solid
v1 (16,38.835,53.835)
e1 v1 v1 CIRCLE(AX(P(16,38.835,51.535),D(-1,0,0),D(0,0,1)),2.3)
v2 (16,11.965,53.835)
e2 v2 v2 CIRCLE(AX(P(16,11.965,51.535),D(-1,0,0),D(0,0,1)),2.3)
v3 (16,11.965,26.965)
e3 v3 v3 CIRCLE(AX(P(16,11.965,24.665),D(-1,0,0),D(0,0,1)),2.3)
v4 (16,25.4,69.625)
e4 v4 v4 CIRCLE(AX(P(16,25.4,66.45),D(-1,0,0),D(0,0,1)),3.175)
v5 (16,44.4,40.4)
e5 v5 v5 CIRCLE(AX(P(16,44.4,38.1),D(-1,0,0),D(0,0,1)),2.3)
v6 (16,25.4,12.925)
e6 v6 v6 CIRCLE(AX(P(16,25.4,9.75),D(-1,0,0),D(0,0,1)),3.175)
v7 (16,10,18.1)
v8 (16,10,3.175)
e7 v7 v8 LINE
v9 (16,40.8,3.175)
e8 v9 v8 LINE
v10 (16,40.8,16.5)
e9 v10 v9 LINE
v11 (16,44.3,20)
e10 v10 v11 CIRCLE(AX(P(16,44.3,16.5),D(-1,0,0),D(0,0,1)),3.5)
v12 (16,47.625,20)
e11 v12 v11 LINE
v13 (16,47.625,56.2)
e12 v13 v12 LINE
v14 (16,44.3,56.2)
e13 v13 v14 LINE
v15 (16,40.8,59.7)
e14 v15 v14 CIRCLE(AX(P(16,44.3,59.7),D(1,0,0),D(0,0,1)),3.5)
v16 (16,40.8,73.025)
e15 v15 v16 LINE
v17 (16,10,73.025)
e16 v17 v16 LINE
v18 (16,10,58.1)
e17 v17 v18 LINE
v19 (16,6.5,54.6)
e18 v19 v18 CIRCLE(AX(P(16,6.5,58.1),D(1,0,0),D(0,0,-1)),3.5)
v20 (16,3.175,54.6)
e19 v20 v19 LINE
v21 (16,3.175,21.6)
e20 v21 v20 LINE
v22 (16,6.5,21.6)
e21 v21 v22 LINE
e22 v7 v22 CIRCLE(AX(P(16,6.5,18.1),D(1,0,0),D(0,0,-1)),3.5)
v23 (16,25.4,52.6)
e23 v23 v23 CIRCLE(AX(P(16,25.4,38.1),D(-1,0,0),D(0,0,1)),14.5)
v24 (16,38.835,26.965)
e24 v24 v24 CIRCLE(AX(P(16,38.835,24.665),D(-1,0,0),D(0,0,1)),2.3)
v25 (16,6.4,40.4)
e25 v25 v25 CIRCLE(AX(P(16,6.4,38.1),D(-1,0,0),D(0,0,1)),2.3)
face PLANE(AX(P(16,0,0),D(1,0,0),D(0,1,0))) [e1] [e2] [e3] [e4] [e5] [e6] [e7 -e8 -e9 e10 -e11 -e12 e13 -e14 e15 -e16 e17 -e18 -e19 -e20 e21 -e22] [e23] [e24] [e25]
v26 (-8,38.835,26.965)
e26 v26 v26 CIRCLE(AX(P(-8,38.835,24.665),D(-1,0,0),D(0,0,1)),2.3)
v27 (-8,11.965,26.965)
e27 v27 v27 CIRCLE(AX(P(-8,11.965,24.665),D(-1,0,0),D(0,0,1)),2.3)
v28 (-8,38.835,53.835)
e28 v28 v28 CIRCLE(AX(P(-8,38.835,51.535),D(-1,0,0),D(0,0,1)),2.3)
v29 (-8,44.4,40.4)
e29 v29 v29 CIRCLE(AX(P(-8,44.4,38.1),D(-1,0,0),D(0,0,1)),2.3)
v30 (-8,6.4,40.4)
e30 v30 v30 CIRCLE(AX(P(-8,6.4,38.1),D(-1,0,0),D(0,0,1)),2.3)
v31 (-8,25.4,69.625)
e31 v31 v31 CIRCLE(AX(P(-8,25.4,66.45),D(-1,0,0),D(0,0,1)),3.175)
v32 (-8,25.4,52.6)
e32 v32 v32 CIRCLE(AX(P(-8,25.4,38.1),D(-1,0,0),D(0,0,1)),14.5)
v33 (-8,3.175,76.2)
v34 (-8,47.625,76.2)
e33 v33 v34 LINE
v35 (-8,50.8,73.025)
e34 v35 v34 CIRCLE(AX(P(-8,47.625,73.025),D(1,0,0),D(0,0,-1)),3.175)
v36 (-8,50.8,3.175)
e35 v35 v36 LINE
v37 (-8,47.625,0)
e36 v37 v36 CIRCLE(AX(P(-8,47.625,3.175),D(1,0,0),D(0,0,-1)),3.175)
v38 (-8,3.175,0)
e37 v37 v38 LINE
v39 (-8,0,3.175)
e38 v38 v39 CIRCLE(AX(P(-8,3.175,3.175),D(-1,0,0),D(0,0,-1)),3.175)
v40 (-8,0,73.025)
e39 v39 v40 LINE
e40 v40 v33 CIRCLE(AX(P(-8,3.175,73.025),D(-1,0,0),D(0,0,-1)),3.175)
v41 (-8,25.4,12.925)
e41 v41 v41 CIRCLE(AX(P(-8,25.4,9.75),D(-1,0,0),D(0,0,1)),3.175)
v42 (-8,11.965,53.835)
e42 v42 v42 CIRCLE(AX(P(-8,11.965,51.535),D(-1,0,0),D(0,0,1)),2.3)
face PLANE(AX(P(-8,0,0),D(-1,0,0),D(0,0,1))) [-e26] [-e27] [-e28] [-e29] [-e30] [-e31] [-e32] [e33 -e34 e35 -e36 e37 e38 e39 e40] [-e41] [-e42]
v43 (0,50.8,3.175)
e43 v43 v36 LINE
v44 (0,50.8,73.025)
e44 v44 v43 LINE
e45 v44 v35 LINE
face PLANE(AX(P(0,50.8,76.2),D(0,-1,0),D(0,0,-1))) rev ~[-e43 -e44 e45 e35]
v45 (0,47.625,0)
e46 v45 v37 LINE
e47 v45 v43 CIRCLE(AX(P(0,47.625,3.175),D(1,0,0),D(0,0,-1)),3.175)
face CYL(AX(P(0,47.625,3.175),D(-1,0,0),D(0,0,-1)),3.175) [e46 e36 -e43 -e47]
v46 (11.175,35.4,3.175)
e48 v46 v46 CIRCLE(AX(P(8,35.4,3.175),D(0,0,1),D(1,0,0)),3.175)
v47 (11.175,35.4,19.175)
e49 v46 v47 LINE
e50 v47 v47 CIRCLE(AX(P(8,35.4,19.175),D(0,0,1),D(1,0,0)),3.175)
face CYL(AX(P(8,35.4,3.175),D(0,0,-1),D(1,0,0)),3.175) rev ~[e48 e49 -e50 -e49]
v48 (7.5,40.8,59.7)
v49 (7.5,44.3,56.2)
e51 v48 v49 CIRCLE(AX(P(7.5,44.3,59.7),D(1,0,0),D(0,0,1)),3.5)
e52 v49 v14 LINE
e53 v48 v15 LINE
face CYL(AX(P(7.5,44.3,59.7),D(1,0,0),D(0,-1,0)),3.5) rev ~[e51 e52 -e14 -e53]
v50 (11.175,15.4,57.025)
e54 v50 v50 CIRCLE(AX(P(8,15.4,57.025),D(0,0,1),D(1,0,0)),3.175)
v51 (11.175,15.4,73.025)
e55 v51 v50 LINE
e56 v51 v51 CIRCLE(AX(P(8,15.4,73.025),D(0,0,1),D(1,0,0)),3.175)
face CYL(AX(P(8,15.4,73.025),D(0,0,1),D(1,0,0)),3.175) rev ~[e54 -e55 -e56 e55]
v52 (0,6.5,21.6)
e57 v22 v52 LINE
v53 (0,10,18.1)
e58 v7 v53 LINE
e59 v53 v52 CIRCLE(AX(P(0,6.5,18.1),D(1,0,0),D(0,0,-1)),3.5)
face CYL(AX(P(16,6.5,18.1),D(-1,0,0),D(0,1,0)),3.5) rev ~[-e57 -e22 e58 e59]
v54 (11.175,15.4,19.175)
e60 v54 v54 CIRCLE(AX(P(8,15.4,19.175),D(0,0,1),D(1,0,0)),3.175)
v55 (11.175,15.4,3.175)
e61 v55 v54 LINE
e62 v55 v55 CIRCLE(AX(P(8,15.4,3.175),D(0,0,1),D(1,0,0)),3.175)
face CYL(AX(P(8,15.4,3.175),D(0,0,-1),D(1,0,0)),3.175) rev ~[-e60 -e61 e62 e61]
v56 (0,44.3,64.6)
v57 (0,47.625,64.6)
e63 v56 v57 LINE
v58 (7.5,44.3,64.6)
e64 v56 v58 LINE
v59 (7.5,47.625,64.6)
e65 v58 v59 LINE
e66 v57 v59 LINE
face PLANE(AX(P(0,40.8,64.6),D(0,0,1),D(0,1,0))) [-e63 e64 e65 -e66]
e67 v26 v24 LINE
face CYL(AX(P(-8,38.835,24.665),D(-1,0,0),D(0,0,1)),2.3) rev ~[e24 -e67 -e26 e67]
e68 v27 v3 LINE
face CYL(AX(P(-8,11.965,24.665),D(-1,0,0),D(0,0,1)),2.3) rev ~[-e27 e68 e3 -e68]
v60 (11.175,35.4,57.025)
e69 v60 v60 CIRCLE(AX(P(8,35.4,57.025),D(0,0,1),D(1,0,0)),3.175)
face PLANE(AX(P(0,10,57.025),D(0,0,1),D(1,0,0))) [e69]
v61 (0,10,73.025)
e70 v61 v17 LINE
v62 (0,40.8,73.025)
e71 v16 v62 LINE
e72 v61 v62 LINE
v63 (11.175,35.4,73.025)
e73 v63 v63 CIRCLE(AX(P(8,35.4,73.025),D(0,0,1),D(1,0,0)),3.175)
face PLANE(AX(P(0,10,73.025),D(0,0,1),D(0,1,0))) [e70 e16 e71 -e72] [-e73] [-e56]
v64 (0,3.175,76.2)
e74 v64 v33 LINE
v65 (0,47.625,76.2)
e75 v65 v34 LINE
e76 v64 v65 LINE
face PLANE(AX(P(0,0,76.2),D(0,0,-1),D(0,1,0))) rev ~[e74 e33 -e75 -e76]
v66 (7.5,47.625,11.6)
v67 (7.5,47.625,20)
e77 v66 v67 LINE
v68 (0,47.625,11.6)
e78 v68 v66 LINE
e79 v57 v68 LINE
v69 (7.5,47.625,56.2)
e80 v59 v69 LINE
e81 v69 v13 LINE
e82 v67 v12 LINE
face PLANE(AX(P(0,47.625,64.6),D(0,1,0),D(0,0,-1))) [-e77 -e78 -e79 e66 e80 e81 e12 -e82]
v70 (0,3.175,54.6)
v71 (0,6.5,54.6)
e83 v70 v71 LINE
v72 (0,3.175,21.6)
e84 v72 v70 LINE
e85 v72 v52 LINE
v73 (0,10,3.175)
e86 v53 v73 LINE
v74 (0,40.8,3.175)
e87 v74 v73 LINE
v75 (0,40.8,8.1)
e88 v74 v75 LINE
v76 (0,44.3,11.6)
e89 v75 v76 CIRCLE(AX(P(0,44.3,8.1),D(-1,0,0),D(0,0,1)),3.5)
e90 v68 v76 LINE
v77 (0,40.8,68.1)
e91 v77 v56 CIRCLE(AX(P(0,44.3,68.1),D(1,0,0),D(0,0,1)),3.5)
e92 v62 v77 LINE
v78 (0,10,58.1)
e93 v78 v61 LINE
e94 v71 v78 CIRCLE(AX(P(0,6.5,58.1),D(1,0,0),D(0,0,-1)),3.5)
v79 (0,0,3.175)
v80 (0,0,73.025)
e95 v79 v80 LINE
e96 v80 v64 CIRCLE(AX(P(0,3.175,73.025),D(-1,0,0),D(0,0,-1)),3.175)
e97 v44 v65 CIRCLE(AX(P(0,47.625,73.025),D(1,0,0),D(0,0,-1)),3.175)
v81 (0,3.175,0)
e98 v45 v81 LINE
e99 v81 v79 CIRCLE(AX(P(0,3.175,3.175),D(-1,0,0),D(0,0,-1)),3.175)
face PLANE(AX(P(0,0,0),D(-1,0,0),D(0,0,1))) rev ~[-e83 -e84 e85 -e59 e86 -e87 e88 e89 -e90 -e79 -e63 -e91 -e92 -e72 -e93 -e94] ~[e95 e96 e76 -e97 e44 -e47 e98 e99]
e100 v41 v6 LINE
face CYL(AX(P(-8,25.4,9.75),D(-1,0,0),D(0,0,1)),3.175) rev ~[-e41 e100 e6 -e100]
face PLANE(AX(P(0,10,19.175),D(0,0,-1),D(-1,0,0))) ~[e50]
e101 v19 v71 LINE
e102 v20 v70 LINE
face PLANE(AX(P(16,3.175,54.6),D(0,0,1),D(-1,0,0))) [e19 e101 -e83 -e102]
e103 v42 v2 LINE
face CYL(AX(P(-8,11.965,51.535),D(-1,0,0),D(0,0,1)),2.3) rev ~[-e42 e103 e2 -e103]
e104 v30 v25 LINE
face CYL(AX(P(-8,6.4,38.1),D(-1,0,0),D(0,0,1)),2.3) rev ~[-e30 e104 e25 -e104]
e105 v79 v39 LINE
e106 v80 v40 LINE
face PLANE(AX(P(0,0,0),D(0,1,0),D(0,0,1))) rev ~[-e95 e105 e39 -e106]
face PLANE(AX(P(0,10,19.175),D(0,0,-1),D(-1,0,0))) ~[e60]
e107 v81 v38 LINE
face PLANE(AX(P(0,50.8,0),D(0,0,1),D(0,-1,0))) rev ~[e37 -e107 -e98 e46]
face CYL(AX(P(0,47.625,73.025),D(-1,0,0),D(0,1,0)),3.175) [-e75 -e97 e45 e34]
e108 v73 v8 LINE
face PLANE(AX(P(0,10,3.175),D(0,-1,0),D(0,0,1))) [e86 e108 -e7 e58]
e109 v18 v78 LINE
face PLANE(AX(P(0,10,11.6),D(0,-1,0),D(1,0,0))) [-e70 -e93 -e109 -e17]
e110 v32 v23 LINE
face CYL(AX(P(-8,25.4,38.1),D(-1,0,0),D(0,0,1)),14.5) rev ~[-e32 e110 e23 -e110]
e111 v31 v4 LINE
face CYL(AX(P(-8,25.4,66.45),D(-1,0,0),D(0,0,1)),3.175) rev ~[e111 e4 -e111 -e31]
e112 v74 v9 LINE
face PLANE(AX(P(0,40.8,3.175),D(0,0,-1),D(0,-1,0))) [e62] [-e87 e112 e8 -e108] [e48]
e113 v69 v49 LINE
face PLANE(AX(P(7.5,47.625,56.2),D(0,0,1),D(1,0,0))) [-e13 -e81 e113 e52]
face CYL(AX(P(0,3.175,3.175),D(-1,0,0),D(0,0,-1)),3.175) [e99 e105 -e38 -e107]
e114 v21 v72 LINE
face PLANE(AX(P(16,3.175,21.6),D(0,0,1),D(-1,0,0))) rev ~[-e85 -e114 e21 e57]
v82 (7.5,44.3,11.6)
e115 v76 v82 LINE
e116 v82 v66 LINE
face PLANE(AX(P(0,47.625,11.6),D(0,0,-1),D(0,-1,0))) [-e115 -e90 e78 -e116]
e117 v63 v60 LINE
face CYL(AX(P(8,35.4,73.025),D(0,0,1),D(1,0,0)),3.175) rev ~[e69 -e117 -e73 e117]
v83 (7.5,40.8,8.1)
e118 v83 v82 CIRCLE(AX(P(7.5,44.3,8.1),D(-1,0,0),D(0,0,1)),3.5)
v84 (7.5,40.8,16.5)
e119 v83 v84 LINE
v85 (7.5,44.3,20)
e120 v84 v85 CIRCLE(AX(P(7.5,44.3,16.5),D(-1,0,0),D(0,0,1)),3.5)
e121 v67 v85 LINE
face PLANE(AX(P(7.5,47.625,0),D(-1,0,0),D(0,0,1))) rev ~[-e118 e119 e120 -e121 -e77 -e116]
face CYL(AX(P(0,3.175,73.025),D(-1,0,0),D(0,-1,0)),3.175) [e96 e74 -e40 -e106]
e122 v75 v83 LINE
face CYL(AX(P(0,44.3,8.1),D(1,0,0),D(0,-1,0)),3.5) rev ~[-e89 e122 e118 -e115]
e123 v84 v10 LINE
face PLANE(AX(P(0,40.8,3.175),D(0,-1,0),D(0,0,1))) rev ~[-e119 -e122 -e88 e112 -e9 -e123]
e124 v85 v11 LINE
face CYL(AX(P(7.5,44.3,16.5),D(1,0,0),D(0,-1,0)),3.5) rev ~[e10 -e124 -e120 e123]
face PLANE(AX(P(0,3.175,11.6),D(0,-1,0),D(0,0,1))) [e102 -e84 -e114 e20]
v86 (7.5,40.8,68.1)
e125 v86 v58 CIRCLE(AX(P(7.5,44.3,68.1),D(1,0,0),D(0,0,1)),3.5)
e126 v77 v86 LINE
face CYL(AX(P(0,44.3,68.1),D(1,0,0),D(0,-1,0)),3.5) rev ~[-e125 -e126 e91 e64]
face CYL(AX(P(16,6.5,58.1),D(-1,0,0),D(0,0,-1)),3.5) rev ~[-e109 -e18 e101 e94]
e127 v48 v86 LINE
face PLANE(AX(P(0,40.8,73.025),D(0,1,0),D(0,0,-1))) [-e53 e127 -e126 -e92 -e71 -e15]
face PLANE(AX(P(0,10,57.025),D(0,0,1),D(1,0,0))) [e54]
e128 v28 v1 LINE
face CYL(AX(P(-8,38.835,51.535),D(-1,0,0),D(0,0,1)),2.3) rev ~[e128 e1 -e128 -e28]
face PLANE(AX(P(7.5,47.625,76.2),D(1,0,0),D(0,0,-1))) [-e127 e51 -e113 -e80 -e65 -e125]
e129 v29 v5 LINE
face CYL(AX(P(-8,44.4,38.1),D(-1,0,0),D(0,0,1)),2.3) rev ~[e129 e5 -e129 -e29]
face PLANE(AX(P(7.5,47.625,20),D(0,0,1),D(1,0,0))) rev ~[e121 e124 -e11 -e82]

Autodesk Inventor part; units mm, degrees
ref_plane "YZ Plane" through (0, 0, 0) normal (1, 0, 0) x (0, 1, 0)
ref_plane "XZ Plane" through (0, 0, 0) normal (0, 1, 0) x (-1, 0, 0)
sketch "Sketch1" plane through (0, 0, 0) normal (1, 0, 0) x (0, 1, 0)
  line L0 (0, 0) -> (50.8, 0) construction
  line L1 (50.8, 0) -> (50.8, 76.2) construction
  line L2 (50.8, 76.2) -> (0, 76.2) construction
  line L3 (0, 76.2) -> (0, 0) construction
  line L4 (40.8, 3.175) -> (10, 3.175)
  line L5 (10, 3.175) -> (10, 11.6)
  line L6 (10, 11.6) -> (3.175, 11.6)
  line L7 (3.175, 11.6) -> (3.175, 64.6)
  line L8 (3.175, 64.6) -> (10, 64.6)
  line L9 (10, 64.6) -> (10, 73.025)
  line L10 (10, 73.025) -> (40.8, 73.025)
  line L11 (40.8, 73.025) -> (40.8, 64.6)
  line L12 (40.8, 64.6) -> (47.625, 64.6)
  line L13 (47.625, 64.6) -> (47.625, 11.6)
  line L14 (47.625, 11.6) -> (40.8, 11.6)
  line L15 (40.8, 3.175) -> (40.8, 11.6)
  line L16 (25.4, 73.025) -> (25.4, 76.2) construction
  line L17 (47.625, 38.1) -> (50.8, 38.1) construction
  line L18 (3.175, 38.1) -> (0, 38.1) construction
  line L19 (25.4, 3.175) -> (25.4, 0) construction
  point P0 (1.5875, 38.1)
  dimension "d0" = 50.8
  dimension "d1" = 76.2
  dimension "d2" = 3.175
  dimension "d3" = 26.5
  dimension "d4" = 10
extrude "Extrusion1" add sketch "Sketch1" along normal blind 16
sketch "Sketch2" plane through (0, 10, 73.025) normal (0, 0, 1) x (1, 0, 0)
  line L0 (0, -10) -> (16, -10) construction
  line L1 (16, -10) -> (16, 40.8) construction
  line L2 (16, 40.8) -> (0, 40.8) construction
  line L3 (0, 40.8) -> (0, -10) construction
  circle A0 centre (8, 25.4) radius 3.175
  circle A1 centre (8, 5.4) radius 3.175
  line L4 (8, 25.4) -> (8, 40.8) construction
  line L5 (8, 5.4) -> (8, -10) construction
  dimension "d7" = 16
  dimension "d8" = 50.8
  dimension "d9" = 6.35
  dimension "d10" = 20
extrude "Extrusion2" cut sketch "Sketch2" against normal blind 16
ref_plane "Work Plane1" through (0, 10, 38.1) normal (0, 0, 1) x (1, 0, 0)
mirror "Mirror1" about plane through (0, 10, 38.1) normal (0, 0, 1) of "Extrusion2"
sketch "Sketch5" plane through (0, 47.625, 64.6) normal (0, 1, 0) x (1, 0, 0)
  line L0 (0, 64.6) -> (16, 64.6) construction
  line L1 (16, 64.6) -> (16, -11.6) construction
  line L2 (16, -11.6) -> (0, -11.6) construction
  line L3 (0, -11.6) -> (0, 64.6) construction
  line L4 (12.5, 3.4) -> (12.5, -11.6) construction
  line L5 (12.5, 49.6) -> (12.5, 64.6) construction
  line L6 (7.5, 8.4) -> (16, 8.4)
  line L7 (16, 8.4) -> (16, -11.6)
  line L8 (16, -11.6) -> (7.5, -11.6)
  line L9 (7.5, -11.6) -> (7.5, 8.4)
  line L10 (12.5, 3.4) -> (7.5, 3.4) construction
  line L11 (12.5, 3.4) -> (16, 3.4) construction
  line L12 (12.5, 3.4) -> (12.5, 8.4) construction
  line L13 (7.5, 44.6) -> (16, 44.6)
  line L14 (16, 44.6) -> (16, 64.6)
  line L15 (16, 64.6) -> (7.5, 64.6)
  line L16 (7.5, 64.6) -> (7.5, 44.6)
  line L17 (12.5, 49.6) -> (12.5, 44.6) construction
  line L18 (12.5, 49.6) -> (7.5, 49.6) construction
  dimension "d18" = 76.2
  dimension "d19" = 16
  dimension "d21" = 15
  dimension "d22" = 12.5
  dimension "d23" = 5
extrude "Extrusion4" cut sketch "Sketch5" against normal up to surface (6.825 mm away)
sketch "Sketch6" plane through (0, 3.175, 11.6) normal (0, -1, 0) x (1, 0, 0)
  line L0 (0, -11.6) -> (16, -11.6) construction
  line L1 (16, -11.6) -> (16, 64.6) construction
  line L2 (16, 64.6) -> (0, 64.6) construction
  line L3 (0, 64.6) -> (0, -11.6) construction
  line L4 (10, 53) -> (10, 0) construction
  line L5 (10, 26.5) -> (0, 26.5) construction
  line L6 (16, 43) -> (0, 43)
  line L7 (0, 43) -> (0, 64.6)
  line L8 (0, 64.6) -> (16, 64.6)
  line L9 (16, 64.6) -> (16, 43)
  line L10 (16, 10) -> (0, 10)
  line L11 (0, 10) -> (0, -11.6)
  line L12 (0, -11.6) -> (16, -11.6)
  line L13 (16, -11.6) -> (16, 10)
  dimension "d26" = 16
  dimension "d27" = 76.2
  dimension "d28" = 10
  dimension "d29" = 53
  dimension "d30" = 10
extrude "Extrusion5" cut sketch "Sketch6" against normal up to surface (6.825 mm away)
fillet "Fillet1" radius 3.5 6 edges at (8, 10, 54.6) (3.75, 40.8, 64.6) (11.75, 40.8, 56.2) (3.75, 40.8, 11.6) (11.75, 40.8, 20) (8, 10, 21.6)
sketch "Sketch4" plane through (0, 0, 0) normal (-1, 0, 0) x (0, 0, 1)
  line L0 (0, 0) -> (76.2, 0)
  line L1 (76.2, 0) -> (76.2, 50.8)
  line L2 (76.2, 50.8) -> (0, 50.8)
  line L3 (0, 50.8) -> (0, 0)
  dimension "d13" = 76.2
  dimension "d14" = 50.8
extrude "Extrusion3" add sketch "Sketch4" along normal blind 8
sketch "Sketch7" plane through (-8, 0, 0) normal (-1, 0, 0) x (0, 0, 1)
  circle A0 centre (38.1, 25.4) radius 14.5
  circle A1 centre (38.1, 25.4) radius 19 construction
  circle A2 centre (24.665, 38.835) radius 2.3
  circle A3 centre (38.1, 44.4) radius 2.3
  circle A4 centre (24.665, 11.965) radius 2.3
  circle A5 centre (38.1, 6.4) radius 2.3
  circle A6 centre (51.535, 38.835) radius 2.3
  circle A7 centre (51.535, 11.965) radius 2.3
  line L0 (51.535, 38.835) -> (38.1, 25.4) construction
  line L1 (38.1, 25.4) -> (38.1, 44.4) construction
  line L2 (0, 0) -> (76.2, 0) construction
  line L3 (76.2, 0) -> (76.2, 50.8) construction
  line L4 (76.2, 50.8) -> (0, 50.8) construction
  line L5 (0, 50.8) -> (0, 0) construction
  circle A8 centre (9.75, 25.4) radius 3.175
  circle A9 centre (66.45, 25.4) radius 3.175
  line L6 (9.75, 25.4) -> (0, 25.4) construction
  line L7 (66.45, 25.4) -> (76.2, 25.4) construction
  circle A10 centre (38.1, 25.4) radius 25 construction
  line L8 (18.1, 25.4) -> (9.75, 25.4) construction
  line L9 (38.1, 25.4) -> (18.1, 25.4) construction
  point P0 (38.1, 50.8)
  dimension "d37" = 29
  dimension "d38" = 38
  dimension "d39" = 4.6
  dimension "d40" = 45
  dimension "d41" = 76.2
  dimension "d42" = 50.8
  dimension "d43" = 6.35
  dimension "d44" = 6.35
  dimension "d45" = 50
  dimension "d51" = 20
  dimension "d52" = 8.35
extrude "Extrusion6" cut sketch "Sketch7" against normal through all
fillet "Fillet2" radius 3.175 4 edges at (-4, 50.8, 0) (-4, 50.8, 76.2) (-4, 0, 76.2) (-4, 0, 0)
properties part number "BS_Face" material "Aluminum 6061"
